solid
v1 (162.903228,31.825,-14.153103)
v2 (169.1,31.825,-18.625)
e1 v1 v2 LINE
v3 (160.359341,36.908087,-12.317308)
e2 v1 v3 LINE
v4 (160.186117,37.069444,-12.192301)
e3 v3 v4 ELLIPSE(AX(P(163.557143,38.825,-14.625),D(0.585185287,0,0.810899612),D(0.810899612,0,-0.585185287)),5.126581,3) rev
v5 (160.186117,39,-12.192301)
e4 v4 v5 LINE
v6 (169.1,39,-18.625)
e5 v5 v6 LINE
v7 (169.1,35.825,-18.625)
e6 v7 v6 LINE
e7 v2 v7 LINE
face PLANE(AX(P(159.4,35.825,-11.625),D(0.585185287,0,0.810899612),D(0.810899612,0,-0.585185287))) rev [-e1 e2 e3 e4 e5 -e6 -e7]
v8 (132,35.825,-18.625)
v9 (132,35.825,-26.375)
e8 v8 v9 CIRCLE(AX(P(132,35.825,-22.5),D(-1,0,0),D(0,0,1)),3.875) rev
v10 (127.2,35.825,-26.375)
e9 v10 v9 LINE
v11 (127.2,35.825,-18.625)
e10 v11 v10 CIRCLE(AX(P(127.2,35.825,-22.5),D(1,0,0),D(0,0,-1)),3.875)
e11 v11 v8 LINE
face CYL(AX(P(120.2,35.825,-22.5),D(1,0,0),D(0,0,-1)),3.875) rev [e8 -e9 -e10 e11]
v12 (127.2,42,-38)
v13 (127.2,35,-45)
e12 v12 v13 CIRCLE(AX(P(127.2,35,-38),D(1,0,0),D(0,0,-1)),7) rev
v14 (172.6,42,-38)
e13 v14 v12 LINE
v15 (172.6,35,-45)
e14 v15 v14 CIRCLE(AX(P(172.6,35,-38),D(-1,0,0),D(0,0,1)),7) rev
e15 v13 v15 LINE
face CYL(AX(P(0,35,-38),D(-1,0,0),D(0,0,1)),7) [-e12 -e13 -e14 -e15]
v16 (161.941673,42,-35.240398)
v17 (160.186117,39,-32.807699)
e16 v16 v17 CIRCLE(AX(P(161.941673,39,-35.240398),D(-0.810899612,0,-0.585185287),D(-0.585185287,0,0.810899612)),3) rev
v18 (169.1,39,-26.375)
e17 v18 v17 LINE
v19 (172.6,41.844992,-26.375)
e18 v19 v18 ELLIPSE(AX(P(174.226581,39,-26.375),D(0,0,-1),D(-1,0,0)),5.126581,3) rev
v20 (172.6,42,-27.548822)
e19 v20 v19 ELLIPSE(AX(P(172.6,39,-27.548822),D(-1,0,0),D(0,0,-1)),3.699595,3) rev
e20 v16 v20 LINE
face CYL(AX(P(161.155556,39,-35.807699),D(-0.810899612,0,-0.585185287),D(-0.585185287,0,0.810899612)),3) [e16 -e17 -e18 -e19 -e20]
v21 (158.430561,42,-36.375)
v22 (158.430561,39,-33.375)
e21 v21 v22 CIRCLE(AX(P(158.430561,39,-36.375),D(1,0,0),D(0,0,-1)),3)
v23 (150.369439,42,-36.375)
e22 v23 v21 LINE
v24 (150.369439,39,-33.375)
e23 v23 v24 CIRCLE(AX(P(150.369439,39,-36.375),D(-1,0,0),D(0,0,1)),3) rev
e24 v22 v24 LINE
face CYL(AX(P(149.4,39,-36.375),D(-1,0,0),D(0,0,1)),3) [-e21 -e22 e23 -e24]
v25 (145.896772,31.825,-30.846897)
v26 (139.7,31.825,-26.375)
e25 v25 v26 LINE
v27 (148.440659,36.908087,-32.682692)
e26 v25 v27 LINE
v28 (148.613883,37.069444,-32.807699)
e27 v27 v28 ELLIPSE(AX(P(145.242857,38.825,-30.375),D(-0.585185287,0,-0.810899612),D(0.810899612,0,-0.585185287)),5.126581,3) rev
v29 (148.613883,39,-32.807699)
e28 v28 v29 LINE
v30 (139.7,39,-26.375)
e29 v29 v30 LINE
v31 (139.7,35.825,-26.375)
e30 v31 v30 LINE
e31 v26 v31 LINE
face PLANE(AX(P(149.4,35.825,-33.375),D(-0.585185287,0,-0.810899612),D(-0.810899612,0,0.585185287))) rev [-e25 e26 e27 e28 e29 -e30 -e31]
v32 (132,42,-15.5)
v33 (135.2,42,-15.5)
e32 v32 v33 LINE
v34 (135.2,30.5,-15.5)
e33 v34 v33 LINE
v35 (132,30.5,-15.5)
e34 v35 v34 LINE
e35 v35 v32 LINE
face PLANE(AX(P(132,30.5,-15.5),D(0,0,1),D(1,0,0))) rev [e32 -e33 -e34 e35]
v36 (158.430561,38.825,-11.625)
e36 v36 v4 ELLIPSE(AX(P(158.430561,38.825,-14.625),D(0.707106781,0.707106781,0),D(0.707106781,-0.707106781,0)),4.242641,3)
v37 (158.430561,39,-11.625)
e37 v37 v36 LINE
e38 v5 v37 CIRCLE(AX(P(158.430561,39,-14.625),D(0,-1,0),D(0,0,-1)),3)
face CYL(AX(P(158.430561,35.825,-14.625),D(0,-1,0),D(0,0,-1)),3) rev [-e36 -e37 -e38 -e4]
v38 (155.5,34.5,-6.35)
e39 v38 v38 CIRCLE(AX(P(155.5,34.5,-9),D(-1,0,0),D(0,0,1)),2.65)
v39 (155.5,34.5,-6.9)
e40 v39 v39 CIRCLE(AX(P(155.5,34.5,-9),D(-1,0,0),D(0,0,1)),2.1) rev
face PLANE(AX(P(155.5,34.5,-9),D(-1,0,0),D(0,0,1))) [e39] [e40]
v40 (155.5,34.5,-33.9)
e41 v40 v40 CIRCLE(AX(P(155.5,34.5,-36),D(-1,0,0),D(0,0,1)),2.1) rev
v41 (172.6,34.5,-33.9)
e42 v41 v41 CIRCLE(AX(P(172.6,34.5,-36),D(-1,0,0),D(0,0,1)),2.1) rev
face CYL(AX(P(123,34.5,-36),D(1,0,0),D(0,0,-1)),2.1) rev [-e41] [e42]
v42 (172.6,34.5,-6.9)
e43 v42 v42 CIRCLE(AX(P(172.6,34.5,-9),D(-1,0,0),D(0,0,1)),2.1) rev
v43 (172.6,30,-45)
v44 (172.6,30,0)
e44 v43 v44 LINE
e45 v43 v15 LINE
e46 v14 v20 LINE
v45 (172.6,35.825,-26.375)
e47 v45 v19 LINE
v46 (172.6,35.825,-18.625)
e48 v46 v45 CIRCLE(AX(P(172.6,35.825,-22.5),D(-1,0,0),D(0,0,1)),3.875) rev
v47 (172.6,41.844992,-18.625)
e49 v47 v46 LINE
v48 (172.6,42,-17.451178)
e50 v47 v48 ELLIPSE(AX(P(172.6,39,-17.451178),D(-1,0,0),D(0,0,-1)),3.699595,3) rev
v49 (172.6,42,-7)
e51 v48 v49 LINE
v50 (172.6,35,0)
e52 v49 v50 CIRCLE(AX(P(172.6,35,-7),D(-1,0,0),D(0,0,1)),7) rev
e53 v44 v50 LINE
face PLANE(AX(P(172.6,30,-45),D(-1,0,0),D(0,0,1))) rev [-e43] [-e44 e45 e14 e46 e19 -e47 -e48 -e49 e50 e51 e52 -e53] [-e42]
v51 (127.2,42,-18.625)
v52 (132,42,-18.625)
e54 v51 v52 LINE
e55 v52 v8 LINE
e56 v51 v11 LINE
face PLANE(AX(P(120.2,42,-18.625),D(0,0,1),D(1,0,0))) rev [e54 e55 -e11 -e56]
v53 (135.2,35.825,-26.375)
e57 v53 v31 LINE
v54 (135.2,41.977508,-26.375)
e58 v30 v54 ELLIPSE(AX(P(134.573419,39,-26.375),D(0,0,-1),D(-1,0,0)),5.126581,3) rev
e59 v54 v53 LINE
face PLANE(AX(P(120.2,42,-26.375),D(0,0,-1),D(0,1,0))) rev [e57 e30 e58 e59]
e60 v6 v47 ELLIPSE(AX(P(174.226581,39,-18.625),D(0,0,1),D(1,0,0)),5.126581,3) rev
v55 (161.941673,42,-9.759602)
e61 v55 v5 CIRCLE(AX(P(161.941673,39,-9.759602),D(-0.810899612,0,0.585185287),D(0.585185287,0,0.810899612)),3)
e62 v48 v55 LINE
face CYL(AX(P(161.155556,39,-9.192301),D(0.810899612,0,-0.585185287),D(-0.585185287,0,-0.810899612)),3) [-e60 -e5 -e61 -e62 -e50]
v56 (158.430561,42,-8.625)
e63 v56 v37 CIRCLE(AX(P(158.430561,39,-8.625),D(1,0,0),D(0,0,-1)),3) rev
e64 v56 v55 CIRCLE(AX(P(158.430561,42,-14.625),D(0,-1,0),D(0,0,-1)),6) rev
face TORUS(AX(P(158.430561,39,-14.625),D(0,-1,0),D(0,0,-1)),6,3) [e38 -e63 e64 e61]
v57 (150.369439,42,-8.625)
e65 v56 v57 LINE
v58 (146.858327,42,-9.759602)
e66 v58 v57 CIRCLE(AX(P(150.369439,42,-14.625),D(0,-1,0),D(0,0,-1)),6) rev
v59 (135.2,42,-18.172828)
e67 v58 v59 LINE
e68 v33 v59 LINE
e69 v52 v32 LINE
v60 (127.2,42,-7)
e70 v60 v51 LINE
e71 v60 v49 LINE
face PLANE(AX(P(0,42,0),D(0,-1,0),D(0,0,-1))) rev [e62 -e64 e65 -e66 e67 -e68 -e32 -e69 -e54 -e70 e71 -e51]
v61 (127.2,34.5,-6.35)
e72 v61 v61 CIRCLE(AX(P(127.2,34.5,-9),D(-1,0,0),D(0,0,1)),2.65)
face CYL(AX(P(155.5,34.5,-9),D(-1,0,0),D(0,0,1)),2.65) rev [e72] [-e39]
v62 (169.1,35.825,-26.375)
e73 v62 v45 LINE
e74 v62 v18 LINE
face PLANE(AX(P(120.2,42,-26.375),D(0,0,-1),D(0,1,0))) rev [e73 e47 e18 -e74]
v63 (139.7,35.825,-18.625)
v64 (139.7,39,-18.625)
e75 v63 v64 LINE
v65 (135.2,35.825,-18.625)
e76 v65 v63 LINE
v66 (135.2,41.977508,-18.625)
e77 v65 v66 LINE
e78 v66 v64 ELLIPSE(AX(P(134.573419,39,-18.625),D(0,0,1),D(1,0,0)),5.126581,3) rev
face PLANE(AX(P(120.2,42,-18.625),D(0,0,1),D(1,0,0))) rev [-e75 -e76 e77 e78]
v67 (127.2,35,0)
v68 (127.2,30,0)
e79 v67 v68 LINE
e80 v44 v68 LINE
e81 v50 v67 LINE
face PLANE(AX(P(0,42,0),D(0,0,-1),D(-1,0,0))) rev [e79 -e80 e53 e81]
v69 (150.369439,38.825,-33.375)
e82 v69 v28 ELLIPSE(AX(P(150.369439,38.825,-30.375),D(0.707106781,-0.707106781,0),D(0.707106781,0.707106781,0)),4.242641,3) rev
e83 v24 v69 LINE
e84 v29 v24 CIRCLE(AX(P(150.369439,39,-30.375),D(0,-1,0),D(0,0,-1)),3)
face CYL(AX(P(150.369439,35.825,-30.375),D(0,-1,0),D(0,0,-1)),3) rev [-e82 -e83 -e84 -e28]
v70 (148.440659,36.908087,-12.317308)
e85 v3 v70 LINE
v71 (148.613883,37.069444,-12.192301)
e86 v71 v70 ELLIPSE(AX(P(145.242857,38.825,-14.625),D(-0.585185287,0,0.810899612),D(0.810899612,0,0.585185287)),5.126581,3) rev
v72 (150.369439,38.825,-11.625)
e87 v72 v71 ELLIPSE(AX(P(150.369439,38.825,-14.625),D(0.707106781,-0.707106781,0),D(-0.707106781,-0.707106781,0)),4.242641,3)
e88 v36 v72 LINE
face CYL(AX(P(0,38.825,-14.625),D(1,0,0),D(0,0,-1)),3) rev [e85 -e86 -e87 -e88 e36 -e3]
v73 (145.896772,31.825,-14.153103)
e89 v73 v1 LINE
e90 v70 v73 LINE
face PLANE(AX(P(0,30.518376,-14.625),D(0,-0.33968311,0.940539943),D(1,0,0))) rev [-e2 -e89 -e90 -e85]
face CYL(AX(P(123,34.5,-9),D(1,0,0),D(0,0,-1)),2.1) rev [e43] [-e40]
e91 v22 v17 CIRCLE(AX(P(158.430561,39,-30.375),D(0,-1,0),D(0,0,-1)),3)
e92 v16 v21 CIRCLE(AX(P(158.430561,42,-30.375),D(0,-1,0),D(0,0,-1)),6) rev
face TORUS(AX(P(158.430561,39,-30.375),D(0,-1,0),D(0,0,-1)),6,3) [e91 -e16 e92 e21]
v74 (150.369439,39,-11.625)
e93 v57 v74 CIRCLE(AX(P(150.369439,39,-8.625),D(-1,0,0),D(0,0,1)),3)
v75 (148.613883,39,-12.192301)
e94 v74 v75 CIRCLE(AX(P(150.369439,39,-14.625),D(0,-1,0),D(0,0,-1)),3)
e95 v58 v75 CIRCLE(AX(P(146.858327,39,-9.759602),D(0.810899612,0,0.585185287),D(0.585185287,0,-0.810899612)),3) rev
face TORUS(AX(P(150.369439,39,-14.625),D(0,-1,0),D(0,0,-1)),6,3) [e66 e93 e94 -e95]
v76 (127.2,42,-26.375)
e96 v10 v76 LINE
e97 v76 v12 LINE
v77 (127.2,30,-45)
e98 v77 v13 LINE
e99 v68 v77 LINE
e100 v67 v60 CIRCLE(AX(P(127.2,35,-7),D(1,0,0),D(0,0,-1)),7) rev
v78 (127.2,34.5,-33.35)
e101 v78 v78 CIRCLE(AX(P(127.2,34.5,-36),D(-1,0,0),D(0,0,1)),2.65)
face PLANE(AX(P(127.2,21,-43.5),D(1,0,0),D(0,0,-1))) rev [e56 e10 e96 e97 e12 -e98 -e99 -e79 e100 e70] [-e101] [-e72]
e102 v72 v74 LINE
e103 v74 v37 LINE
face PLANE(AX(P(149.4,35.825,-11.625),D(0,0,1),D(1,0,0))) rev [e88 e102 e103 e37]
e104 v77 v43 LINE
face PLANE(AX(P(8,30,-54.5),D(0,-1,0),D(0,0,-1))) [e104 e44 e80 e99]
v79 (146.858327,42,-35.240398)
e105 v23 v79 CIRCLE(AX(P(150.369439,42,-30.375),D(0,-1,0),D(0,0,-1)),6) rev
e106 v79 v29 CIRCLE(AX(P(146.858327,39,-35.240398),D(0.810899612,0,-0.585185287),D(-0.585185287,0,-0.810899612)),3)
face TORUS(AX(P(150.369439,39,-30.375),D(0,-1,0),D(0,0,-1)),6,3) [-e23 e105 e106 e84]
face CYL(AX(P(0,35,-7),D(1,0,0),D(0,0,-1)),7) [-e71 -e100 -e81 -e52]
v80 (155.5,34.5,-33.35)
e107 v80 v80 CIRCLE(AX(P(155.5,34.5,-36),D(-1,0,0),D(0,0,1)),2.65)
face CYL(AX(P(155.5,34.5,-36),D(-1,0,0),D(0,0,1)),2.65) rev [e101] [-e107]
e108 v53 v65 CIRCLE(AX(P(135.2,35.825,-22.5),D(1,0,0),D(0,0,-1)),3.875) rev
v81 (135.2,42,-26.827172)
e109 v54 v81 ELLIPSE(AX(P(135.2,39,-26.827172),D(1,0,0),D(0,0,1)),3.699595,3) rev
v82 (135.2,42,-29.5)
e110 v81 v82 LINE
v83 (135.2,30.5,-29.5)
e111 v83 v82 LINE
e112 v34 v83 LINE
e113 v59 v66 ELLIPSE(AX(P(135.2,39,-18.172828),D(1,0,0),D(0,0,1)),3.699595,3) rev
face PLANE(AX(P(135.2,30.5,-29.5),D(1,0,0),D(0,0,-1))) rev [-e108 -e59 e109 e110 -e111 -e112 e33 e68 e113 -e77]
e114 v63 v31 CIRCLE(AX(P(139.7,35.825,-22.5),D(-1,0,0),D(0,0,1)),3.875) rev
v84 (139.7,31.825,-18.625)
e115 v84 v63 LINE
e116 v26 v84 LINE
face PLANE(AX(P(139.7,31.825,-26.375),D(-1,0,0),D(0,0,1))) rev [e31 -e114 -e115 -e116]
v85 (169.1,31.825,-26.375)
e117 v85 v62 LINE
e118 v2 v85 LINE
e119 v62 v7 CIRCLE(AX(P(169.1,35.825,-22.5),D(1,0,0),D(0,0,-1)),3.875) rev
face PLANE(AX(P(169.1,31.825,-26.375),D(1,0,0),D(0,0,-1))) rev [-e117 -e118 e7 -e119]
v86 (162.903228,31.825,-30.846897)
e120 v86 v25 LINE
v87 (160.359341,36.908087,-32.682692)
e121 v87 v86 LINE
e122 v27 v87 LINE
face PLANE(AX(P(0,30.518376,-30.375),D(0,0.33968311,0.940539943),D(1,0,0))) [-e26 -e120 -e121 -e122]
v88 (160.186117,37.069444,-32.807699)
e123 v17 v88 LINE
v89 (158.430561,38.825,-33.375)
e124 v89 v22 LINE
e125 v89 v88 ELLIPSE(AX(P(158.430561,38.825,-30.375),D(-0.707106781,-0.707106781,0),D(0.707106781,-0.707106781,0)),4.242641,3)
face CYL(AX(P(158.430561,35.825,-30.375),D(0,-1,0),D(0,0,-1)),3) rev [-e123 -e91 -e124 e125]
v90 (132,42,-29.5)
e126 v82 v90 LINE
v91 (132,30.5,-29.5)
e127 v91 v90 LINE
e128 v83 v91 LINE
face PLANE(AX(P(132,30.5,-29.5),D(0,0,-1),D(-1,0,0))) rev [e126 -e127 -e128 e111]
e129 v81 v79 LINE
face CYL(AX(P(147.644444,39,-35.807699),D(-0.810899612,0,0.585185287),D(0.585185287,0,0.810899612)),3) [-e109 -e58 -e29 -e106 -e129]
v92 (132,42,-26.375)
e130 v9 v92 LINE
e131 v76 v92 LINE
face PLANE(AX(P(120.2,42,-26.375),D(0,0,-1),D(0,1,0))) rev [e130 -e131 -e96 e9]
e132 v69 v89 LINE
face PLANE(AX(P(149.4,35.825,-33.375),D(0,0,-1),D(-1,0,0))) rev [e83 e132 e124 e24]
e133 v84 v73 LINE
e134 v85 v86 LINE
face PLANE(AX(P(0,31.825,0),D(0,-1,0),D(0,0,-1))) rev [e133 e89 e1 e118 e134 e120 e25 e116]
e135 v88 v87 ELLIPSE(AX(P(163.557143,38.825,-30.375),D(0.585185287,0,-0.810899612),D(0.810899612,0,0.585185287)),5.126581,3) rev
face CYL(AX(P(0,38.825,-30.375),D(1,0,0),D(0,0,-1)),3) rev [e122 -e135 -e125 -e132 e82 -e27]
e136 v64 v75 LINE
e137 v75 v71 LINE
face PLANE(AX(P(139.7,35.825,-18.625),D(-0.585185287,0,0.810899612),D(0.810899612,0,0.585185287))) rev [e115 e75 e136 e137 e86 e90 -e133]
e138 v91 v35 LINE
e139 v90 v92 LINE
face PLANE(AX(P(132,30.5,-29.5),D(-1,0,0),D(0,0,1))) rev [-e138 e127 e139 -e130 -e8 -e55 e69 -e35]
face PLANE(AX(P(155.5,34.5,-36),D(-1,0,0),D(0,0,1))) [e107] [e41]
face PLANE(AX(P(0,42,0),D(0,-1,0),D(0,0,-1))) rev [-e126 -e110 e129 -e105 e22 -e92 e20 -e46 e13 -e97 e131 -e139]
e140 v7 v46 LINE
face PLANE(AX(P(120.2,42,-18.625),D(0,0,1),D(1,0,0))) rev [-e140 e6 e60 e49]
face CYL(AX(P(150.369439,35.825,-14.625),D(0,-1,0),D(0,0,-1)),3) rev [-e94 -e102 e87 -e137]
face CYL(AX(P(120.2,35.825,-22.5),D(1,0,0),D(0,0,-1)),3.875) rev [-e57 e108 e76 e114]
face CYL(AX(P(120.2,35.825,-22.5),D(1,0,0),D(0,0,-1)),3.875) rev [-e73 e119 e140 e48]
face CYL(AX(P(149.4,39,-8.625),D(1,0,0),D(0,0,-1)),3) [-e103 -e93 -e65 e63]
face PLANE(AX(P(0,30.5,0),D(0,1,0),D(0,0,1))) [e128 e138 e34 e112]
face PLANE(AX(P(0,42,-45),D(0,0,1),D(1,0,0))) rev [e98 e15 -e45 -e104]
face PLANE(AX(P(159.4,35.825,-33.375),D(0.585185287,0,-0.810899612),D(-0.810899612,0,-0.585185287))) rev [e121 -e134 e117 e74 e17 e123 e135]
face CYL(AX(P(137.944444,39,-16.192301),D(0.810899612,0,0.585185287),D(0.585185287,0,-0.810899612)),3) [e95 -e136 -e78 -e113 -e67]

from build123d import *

# Parameters (mm, degrees)
SKETCH1_W                = 218
SKETCH1_H                = 45
BOSS_EXTRUDE1_DEPTH      = 42
SKETCH7_W                = 118.2
SKETCH7_H                = 42
CUT_EXTRUDE17_DEPTH      = 21
SKETCH4_W                = 7.75
SKETCH4_H                = 6.175
CUT_EXTRUDE14_DEPTH      = 97.8
SKETCH5_R                = 3.875
CUT_EXTRUDE15_DEPTH      = 97.8
SKETCH11_W               = 3.2
SKETCH11_H               = 14
CUT_EXTRUDE19_DEPTH      = 11.5
CUT_EXTRUDE43_DEPTH      = 7
SKETCH53_R               = 2.1
CUT_EXTRUDE44_DEPTH      = 95
SKETCH68_R               = 2.65
CUT_EXTRUDE57_DEPTH      = 28.3
BOSS_EXTRUDE2_DEPTH      = 5
SKETCH42_W               = 80.5
SKETCH42_H               = 9.5
BOSS_EXTRUDE3_DEPTH      = 35
SKETCH38_R               = 3.1
CUT_EXTRUDE32_DEPTH      = 4.7
SKETCH40_R               = 5.5
CUT_EXTRUDE34_DEPTH      = 9
SKETCH41_R               = 5.75
CUT_EXTRUDE35_DEPTH      = 4
FILLET1_R                = 7
FILLET7_R                = 5
SKETCH47_R               = 1.5
CUT_EXTRUDE39_DEPTH      = 7
SKETCH49_R               = 2.8
CUT_EXTRUDE41_DEPTH      = 33
SKETCH56_W               = 15.8
SKETCH56_H               = 10.4
CUT_EXTRUDE47_DEPTH      = 32.15
SKETCH57_W               = 5
SKETCH57_H               = 10.4
CUT_EXTRUDE48_DEPTH      = 15
SKETCH58_R               = 2.8
SKETCH58_R_2             = 2.05
CUT_EXTRUDE49_DEPTH      = 10
SKETCH59_R               = 1.5
SKETCH59_R_2             = 0.95
CUT_EXTRUDE50_DEPTH      = 6.5
CUT_EXTRUDE51_START      = -9
CUT_EXTRUDE51_DEPTH      = 9
CUT_EXTRUDE52_DEPTH      = 118.2
SKETCH64_R               = 1.5
CUT_EXTRUDE53_DEPTH      = 14
SKETCH65_R               = 2.8
CUT_EXTRUDE54_DEPTH      = 9.95
SKETCH66_R               = 1.5
CUT_EXTRUDE55_DEPTH      = 25
SKETCH67_R               = 1.45
CUT_EXTRUDE56_DEPTH      = 7
CUT_EXTRUDE58_START      = -4
SKETCH69_R               = 2.8
CUT_EXTRUDE58_DEPTH      = 41
CUT_EXTRUDE59_DEPTH      = 6.175
FILLET17_R               = 3
CUT_EXTRUDE64_DEPTH      = 4
FILLET19_R               = 3
CUT_EXTRUDE65_DEPTH      = 4
CUT_EXTRUDE61_DEPTH      = 1
CUT_EXTRUDE61_DEPTH_BACK = 221.034656475
SKETCH72_W               = 64
SKETCH72_H               = 35
SKETCH74_W               = 118.2
SKETCH74_H               = 64
CUT_EXTRUDE62_DEPTH      = 226.02944262
SKETCH81_W               = 45.4
SKETCH81_H               = 45
CUT_EXTRUDE66_DEPTH      = 12


with BuildPart() as part:
    # Sketch1 → Boss-Extrude1 (new body)
    with BuildSketch(Plane(origin=(0, 0, 0), x_dir=(1, 0, 0), z_dir=(0, 1, 0))):
        with Locations((109, 22.5)):
            Rectangle(SKETCH1_W, SKETCH1_H)
    extrude(amount=BOSS_EXTRUDE1_DEPTH)

    # Sketch7 → Cut-Extrude17 (cut)
    with BuildSketch(Plane(origin=(0, 42, 0), x_dir=(1, 0, 0), z_dir=(0, 1, 0))):
        with Locations((68.1, 22.5)):
            Rectangle(SKETCH7_W, SKETCH7_H)
    extrude(amount=-CUT_EXTRUDE17_DEPTH, mode=Mode.SUBTRACT)

    # Sketch4 → Cut-Extrude14 (cut)
    with BuildSketch(Plane(origin=(218, 0, 0), x_dir=(0, 0, -1), z_dir=(1, 0, 0))):
        with Locations((22.5, 38.9125)):
            Rectangle(SKETCH4_W, SKETCH4_H)
    extrude(amount=-CUT_EXTRUDE14_DEPTH, mode=Mode.SUBTRACT)

    # Sketch5 → Cut-Extrude15 (cut)
    with BuildSketch(Plane(origin=(218, 0, 0), x_dir=(0, 0, -1), z_dir=(1, 0, 0))):
        with Locations((22.5, 35.825)):
            Circle(SKETCH5_R)
    extrude(amount=-CUT_EXTRUDE15_DEPTH, mode=Mode.SUBTRACT)

    # Sketch11 → Cut-Extrude19 (cut)
    with BuildSketch(Plane(origin=(0, 42, 0), x_dir=(1, 0, 0), z_dir=(0, 1, 0))):
        with Locations((133.6, 22.5)):
            Rectangle(SKETCH11_W, SKETCH11_H)
    extrude(amount=-CUT_EXTRUDE19_DEPTH, mode=Mode.SUBTRACT)

    # Sketch52 → Cut-Extrude43 (cut)
    with BuildSketch(Plane(origin=(218, 0, 0), x_dir=(0, 0, -1), z_dir=(1, 0, 0))):
        with BuildLine():
            Line((17.475, 42), (17.475, 35.825))
            ThreePointArc((17.475, 35.825), (22.5, 30.8), (27.525, 35.825))
            Line((27.525, 35.825), (27.525, 42))
            Line((27.525, 42), (17.475, 42))
        make_face()
    extrude(amount=-CUT_EXTRUDE43_DEPTH, mode=Mode.SUBTRACT)

    # Sketch53 → Cut-Extrude44 (cut)
    with BuildSketch(Plane(origin=(218, 0, 0), x_dir=(0, 0, -1), z_dir=(1, 0, 0))):
        with Locations((9, 34.5)):
            Circle(SKETCH53_R)
        with Locations((36, 34.5)):
            Circle(SKETCH53_R)
    extrude(amount=-CUT_EXTRUDE44_DEPTH, mode=Mode.SUBTRACT)

    # Sketch68 → Cut-Extrude57 (cut)
    with BuildSketch(Plane.ZY.offset(-127.2)):
        with Locations((-9, 34.5)):
            Circle(SKETCH68_R)
        with Locations((-36, 34.5)):
            Circle(SKETCH68_R)
    extrude(amount=-CUT_EXTRUDE57_DEPTH, mode=Mode.SUBTRACT)

    # Sketch14 → Boss-Extrude2 (add)
    with BuildSketch(Plane.XZ):
        Polygon((9, -54.5), (89.5, -54.5), (89.5, -45), (218, -45), (218, 0), (89.5, 0), (89.5, 9.5), (9, 9.5), (9, 0), (0, 0), (0, -45), (9, -45), align=None)
    extrude(amount=BOSS_EXTRUDE2_DEPTH)

    # Sketch42 → Boss-Extrude3 (add)
    with BuildSketch(Plane(origin=(0, 0, 0), x_dir=(1, 0, 0), z_dir=(0, 1, 0))):
        with Locations((49.25, -4.75)):
            Rectangle(SKETCH42_W, SKETCH42_H)
        with Locations((49.25, 49.75)):
            Rectangle(SKETCH42_W, SKETCH42_H)
    extrude(amount=BOSS_EXTRUDE3_DEPTH)

    # Sketch38 → Cut-Extrude32 (cut)
    with BuildSketch(Plane(origin=(127.2, -5, -22.5), x_dir=(0, 0, -1), z_dir=(0, -1, 0))):
        with Locations((23.5, -61.2)):
            Circle(SKETCH38_R)
        with Locations((10, -61.2)):
            Circle(SKETCH38_R)
    extrude(amount=-CUT_EXTRUDE32_DEPTH, mode=Mode.SUBTRACT)

    # Sketch40 → Cut-Extrude34 (cut)
    with BuildSketch(Plane(origin=(127.2, -5, -22.5), x_dir=(0, 0, -1), z_dir=(0, -1, 0))):
        with Locations((0, -33.7)):
            Circle(SKETCH40_R)
    extrude(amount=-CUT_EXTRUDE34_DEPTH, mode=Mode.SUBTRACT)

    # Sketch41 → Cut-Extrude35 (cut)
    with BuildSketch(Plane(origin=(127.2, -5, -22.5), x_dir=(0, 0, -1), z_dir=(0, -1, 0))):
        with Locations((20, -73.2)):
            Circle(SKETCH41_R)
        with Locations((-20, -73.2)):
            Circle(SKETCH41_R)
    extrude(amount=-CUT_EXTRUDE35_DEPTH, mode=Mode.SUBTRACT)

    # Fillet1
    # the kernel refuses this fillet: 7 mm, written as the material it takes off along each edge
    with BuildSketch(Plane(origin=(235.5, 42, -45), x_dir=(0, 0, 1), z_dir=(-1, 0, 0))) as fillet1_piece_1:
        with BuildLine():
            CenterArc((FILLET1_R, -FILLET1_R), FILLET1_R, 90, 90)
            Line((0, -FILLET1_R), (0, 0))
            Line((0, 0), (FILLET1_R, 0))
        make_face()
    extrude(amount=253, mode=Mode.SUBTRACT)
    with BuildSketch(Plane(origin=(-17.5, 42, 0), x_dir=(0, -1, 0), z_dir=(1, 0, 0))) as fillet1_piece_2:
        with BuildLine():
            CenterArc((FILLET1_R, FILLET1_R), FILLET1_R, 180, 90)
            Line((0, FILLET1_R), (0, 0))
            Line((0, 0), (FILLET1_R, 0))
        make_face()
    extrude(amount=253, mode=Mode.SUBTRACT)

    # Fillet7
    fillet7_edges = [part.edges().sort_by_distance(p)[0] for p in [
        (49.25, 35, -54.5),
        (49.25, 35, 9.5),
    ]]
    fillet(fillet7_edges, radius=FILLET7_R)

    # Sketch47 → Cut-Extrude39 (cut)
    with BuildSketch(Plane(origin=(127.2, -0.3, -22.5), x_dir=(0, 0, -1), z_dir=(0, -1, 0))):
        with Locations((23.5, -61.2)):
            Circle(SKETCH47_R)
        with Locations((10, -61.2)):
            Circle(SKETCH47_R)
    extrude(amount=-CUT_EXTRUDE39_DEPTH, mode=Mode.SUBTRACT)

    # Sketch49 → Cut-Extrude41 (cut)
    with BuildSketch(Plane.XZ.offset(-6.7)):
        with Locations(Location((66, -32.5, 0), (0, 0, 270))):
            Circle(SKETCH49_R)
        with Locations(Location((66, -46, 0), (0, 0, 270))):
            Circle(SKETCH49_R)
    extrude(amount=-CUT_EXTRUDE41_DEPTH, mode=Mode.SUBTRACT)

    # Sketch56 → Cut-Extrude47 (cut)
    with BuildSketch(Plane.XZ.offset(5)):
        with Locations((135.1, -14.2)):
            Rectangle(SKETCH56_W, SKETCH56_H)
    extrude(amount=-CUT_EXTRUDE47_DEPTH, mode=Mode.SUBTRACT)

    # Sketch57 → Cut-Extrude48 (cut)
    with BuildSketch(Plane.XZ.offset(5)):
        with Locations((124.7, -14.2)):
            Rectangle(SKETCH57_W, SKETCH57_H)
    extrude(amount=-CUT_EXTRUDE48_DEPTH, mode=Mode.SUBTRACT)

    # Sketch58 → Cut-Extrude49 (cut)
    with BuildSketch(Plane(origin=(127.2, 21, 0), x_dir=(0, -1, 0), z_dir=(0, 0, 1))):
        with Locations(Location((19.05, 2.8, 0), (0, 0, 90))):
            Circle(SKETCH58_R)
        with Locations(Location((10.15, 2.8, 0), (0, 0, 90))):
            Circle(SKETCH58_R_2)
        with BuildLine():
            Line((-2.632795978, 15.65), (-3.667204022, 15.65))
            ThreePointArc((-3.667204022, 15.65), (-5.85, 13), (-3.667204022, 10.35))
            Line((-3.667204022, 10.35), (-2.632795978, 10.35))
            ThreePointArc((-2.632795978, 10.35), (-0.45, 13), (-2.632795978, 15.65))
        make_face()
    extrude(amount=-CUT_EXTRUDE49_DEPTH, mode=Mode.SUBTRACT)

    # Sketch59 → Cut-Extrude50 (cut)
    with BuildSketch(Plane.XY.offset(-19.4)):
        with Locations((130, 1.95)):
            Circle(SKETCH59_R)
        with Locations((130, 10.85)):
            Circle(SKETCH59_R_2)
        with Locations((140.2, 24.15)):
            Circle(SKETCH59_R)
    extrude(amount=-CUT_EXTRUDE50_DEPTH, mode=Mode.SUBTRACT)

    # Sketch62 → Cut-Extrude51 (cut)
    with BuildSketch(Plane.ZY.offset(CUT_EXTRUDE51_START)):
        with BuildLine():
            Line((0, -5), (-45, -5))
            Line((-45, -5), (-45, 35))
            ThreePointArc((-45, 35), (-42.949747468, 39.949747468), (-38, 42))
            Line((-38, 42), (-7, 42))
            ThreePointArc((-7, 42), (-2.050252532, 39.949747468), (0, 35))
            Line((0, 35), (0, -5))
        make_face()
    extrude(amount=CUT_EXTRUDE51_DEPTH, mode=Mode.SUBTRACT)

    # Sketch63 → Cut-Extrude52 (cut)
    with BuildSketch(Plane(origin=(127.2, 21, -22.5), x_dir=(0, 0, -1), z_dir=(-1, 0, 0))):
        with BuildLine():
            Line((-10.959716831, -18.950283169), (11.040283169, -18.950283169))
            ThreePointArc((11.040283169, -18.950283169), (18.111350981, -16.021350981), (21.040283169, -8.950283169))
            Line((21.040283169, -8.950283169), (21.040283169, 2.049716831))
            ThreePointArc((21.040283169, 2.049716831), (18.111350981, 9.120784643), (11.040283169, 12.049716831))
            Line((11.040283169, 12.049716831), (-10.959716831, 12.049716831))
            ThreePointArc((-10.959716831, 12.049716831), (-18.030784643, 9.120784643), (-20.959716831, 2.049716831))
            Line((-20.959716831, 2.049716831), (-20.959716831, -8.950283169))
            ThreePointArc((-20.959716831, -8.950283169), (-18.030784643, -16.021350981), (-10.959716831, -18.950283169))
        make_face()
    extrude(amount=CUT_EXTRUDE52_DEPTH, mode=Mode.SUBTRACT)

    # Sketch64 → Cut-Extrude53 (cut)
    with BuildSketch(Plane(origin=(127.2, -5, -22.5), x_dir=(0, 0, -1), z_dir=(0, -1, 0))):
        with Locations((-1, -71.2)):
            Circle(SKETCH64_R)
    extrude(amount=-CUT_EXTRUDE53_DEPTH, mode=Mode.SUBTRACT)

    # Sketch65 → Cut-Extrude54 (cut)
    with BuildSketch(Plane(origin=(127.2, 8.950283169, -22.5), x_dir=(0, 0, 1), z_dir=(0, 1, 0))):
        with Locations((1, -71.2)):
            Circle(SKETCH65_R)
    extrude(amount=-CUT_EXTRUDE54_DEPTH, mode=Mode.SUBTRACT)

    # Sketch66 → Cut-Extrude55 (cut)
    with BuildSketch(Plane(origin=(127.2, -5, -22.5), x_dir=(0, 0, -1), z_dir=(0, -1, 0))):
        with Locations((-20, -52.2)):
            Circle(SKETCH66_R)
    extrude(amount=-CUT_EXTRUDE55_DEPTH, mode=Mode.SUBTRACT)

    # Sketch67 → Cut-Extrude56 (cut)
    with BuildSketch(Plane(origin=(9, 21, -22.5), x_dir=(0, 0, -1), z_dir=(-1, 0, 0))):
        with Locations(Location((27, -9, 0), (0, 0, 180))):
            Circle(SKETCH67_R)
        with Locations(Location((27, 21, 0), (0, 0, 180))):
            Circle(SKETCH67_R)
        with Locations(Location((-27, 21, 0), (0, 0, 180))):
            Circle(SKETCH67_R)
        with Locations(Location((-27, -9, 0), (0, 0, 180))):
            Circle(SKETCH67_R)
    extrude(amount=-CUT_EXTRUDE56_DEPTH, mode=Mode.SUBTRACT)

    # Sketch69 → Cut-Extrude58 (cut)
    with BuildSketch(Plane(origin=(127.2, -5, -22.5), x_dir=(0, 0, -1), z_dir=(0, -1, 0)).offset(CUT_EXTRUDE58_START)):
        with Locations((-20, -52.2)):
            Circle(SKETCH69_R)
    extrude(amount=-CUT_EXTRUDE58_DEPTH, mode=Mode.SUBTRACT)

    # Sketch70 → Cut-Extrude59 (cut)
    with BuildSketch(Plane(origin=(0, 42, 0), x_dir=(1, 0, 0), z_dir=(0, 1, 0))):
        Polygon((149.4, 33.375), (159.4, 33.375), (169.1, 26.375), (139.7, 26.375), align=None)
        Polygon((177.1, 26.375), (186.8, 33.375), (196.8, 33.375), (206.5, 26.375), align=None)
        Polygon((139.7, 18.625), (149.4, 11.625), (159.4, 11.625), (169.1, 18.625), align=None)
        Polygon((177.1, 18.625), (186.8, 11.625), (196.8, 11.625), (206.5, 18.625), align=None)
    extrude(amount=-CUT_EXTRUDE59_DEPTH, mode=Mode.SUBTRACT)

    # Fillet17
    fillet17_edges = [part.edges().sort_by_distance(p)[0] for p in [
        (154.4, 35.825, -11.625),
        (159.4, 38.9125, -11.625),
        (149.4, 38.9125, -11.625),
        (144.55, 42, -15.125),
        (154.4, 42, -11.625),
        (164.25, 42, -15.125),
        (154.4, 35.825, -33.375),
        (149.4, 38.9125, -33.375),
        (159.4, 38.9125, -33.375),
        (164.25, 42, -29.875),
        (154.4, 42, -33.375),
        (144.55, 42, -29.875),
    ]]
    fillet(fillet17_edges, radius=FILLET17_R)

    # Sketch78 → Cut-Extrude64 (cut)
    with BuildSketch(Plane(origin=(0, 35.825, 0), x_dir=(1, 0, 0), z_dir=(0, 1, 0))):
        Polygon((145.242857143, 30.375), (163.557142857, 30.375), (169.1, 26.375), (169.1, 18.625), (163.557142857, 14.625), (145.242857143, 14.625), (139.7, 18.625), (139.7, 26.375), align=None)
    extrude(amount=-CUT_EXTRUDE64_DEPTH, mode=Mode.SUBTRACT)

    # Fillet19
    # the kernel refuses this fillet: 3 mm, written as the material it adds along each edge
    with BuildSketch(Plane(origin=(186.8, 42, -11.625), x_dir=(-0.8108996116451952, 0, -0.5851852867542652), z_dir=(0, -1, 0)), Plane(origin=(196.8, 42, -11.625), x_dir=(-1, 0, 0), z_dir=(0, -1, 0))) as fillet19_piece_1:
        with BuildLine():
            CenterArc((FILLET19_R * 0.323146177177, FILLET19_R), FILLET19_R, 234.183919251, 35.816080749)
            Line((-FILLET19_R * 0.262039109577, FILLET19_R * 0.189100388355), (0, 0))
            Line((0, 0), (FILLET19_R * 0.323146177177, 0))
        make_face()
    extrude(amount=8.598596329)
    with BuildSketch(Plane(origin=(179.3, 35.825, -11.625), x_dir=(0, 1, 0), z_dir=(1, 0, 0))) as fillet19_piece_2:
        with BuildLine():
            CenterArc((FILLET19_R, -FILLET19_R), FILLET19_R, 90, 90)
            Line((0, -FILLET19_R), (0, 0))
            Line((0, 0), (FILLET19_R, 0))
        make_face()
    extrude(amount=25)
    with BuildSketch(Plane(origin=(196.8, 42, -33.375), x_dir=(-1, 0, 0), z_dir=(0, -1, 0)), Plane(origin=(186.8, 42, -33.375), x_dir=(-0.8108996116451974, 0, 0.5851852867542621), z_dir=(0, -1, 0))) as fillet19_piece_3:
        with BuildLine():
            CenterArc((FILLET19_R * 0.323146177177, -FILLET19_R), FILLET19_R, 90, 35.816080749)
            Line((-FILLET19_R * 0.262039109577, -FILLET19_R * 0.189100388355), (0, 0))
            Line((0, 0), (FILLET19_R * 0.323146177177, 0))
        make_face()
    extrude(amount=8.598596329)
    with BuildSketch(Plane(origin=(179.3, 35.825, -33.375), x_dir=(0, 1, 0), z_dir=(1, 0, 0))) as fillet19_piece_4:
        with BuildLine():
            CenterArc((FILLET19_R, FILLET19_R), FILLET19_R, 180, 90)
            Line((0, FILLET19_R), (0, 0))
            Line((0, 0), (FILLET19_R, 0))
        make_face()
    extrude(amount=25)
    # the kernel refuses this fillet: 3 mm, written as the material it takes off along each edge
    with BuildSketch(Plane(origin=(171.018252913, 42, -23.013889651), x_dir=(-0.5851852867542667, 0, 0.8108996116451942), z_dir=(0.8108996116451941, 0, 0.5851852867542667)), Plane(origin=(197.586117329, 42, -12.192301165), x_dir=(0.5851852867542677, 0, 0.8108996116451934), z_dir=(0.8108996116451934, 0, -0.5851852867542677))) as fillet19_2_piece_1:
        with BuildLine():
            CenterArc((FILLET19_R, FILLET19_R), FILLET19_R, 180, 90)
            Line((0, FILLET19_R), (0, 0))
            Line((0, 0), (FILLET19_R, 0))
        make_face()
    extrude(amount=18.492584709, mode=Mode.SUBTRACT)
    with BuildSketch(Plane(origin=(197.586117329, 42, -32.807698835), x_dir=(0.585185286754268, 0, -0.8108996116451932), z_dir=(0.8108996116451932, 0, 0.585185286754268)), Plane(origin=(171.018252913, 42, -21.986110349), x_dir=(-0.5851852867542668, 0, -0.810899611645194), z_dir=(0.8108996116451941, 0, -0.5851852867542668))) as fillet19_2_piece_2:
        with BuildLine():
            CenterArc((FILLET19_R, -FILLET19_R), FILLET19_R, 90, 90)
            Line((0, -FILLET19_R), (0, 0))
            Line((0, 0), (FILLET19_R, 0))
        make_face()
    extrude(amount=18.492584709, mode=Mode.SUBTRACT)
    with BuildSketch(Plane(origin=(187.769438532, 42, -11.625), x_dir=(0, 0, 1), z_dir=(1, 0, 0))) as fillet19_2_piece_3:
        with BuildLine():
            CenterArc((FILLET19_R, FILLET19_R), FILLET19_R, 180, 90)
            Line((0, FILLET19_R), (0, 0))
            Line((0, 0), (FILLET19_R, 0))
        make_face()
    extrude(amount=8.061122937, mode=Mode.SUBTRACT)
    with BuildSketch(Plane(origin=(187.769438532, 42, -33.375), x_dir=(0, 0, -1), z_dir=(1, 0, 0))) as fillet19_2_piece_4:
        with BuildLine():
            CenterArc((FILLET19_R, -FILLET19_R), FILLET19_R, 90, 90)
            Line((0, -FILLET19_R), (0, 0))
            Line((0, 0), (FILLET19_R, 0))
        make_face()
    extrude(amount=8.061122937, mode=Mode.SUBTRACT)
    with BuildSketch(Plane(origin=(187.769438532, 42, -30.375), x_dir=(-0.5851852867542677, 0, -0.8108996116451933), z_dir=(-0.8108996116451933, 0, 0.5851852867542677))) as fillet19_2_piece_5:
        with BuildLine():
            CenterArc((3 + FILLET19_R, FILLET19_R), FILLET19_R, 180, 90)
            Line((3, FILLET19_R), (3, 0))
            Line((3, 0), (3 + FILLET19_R, 0))
        make_face()
    revolve(axis=Axis((187.769438532, 42, -30.375), (0, -1, 0)), revolution_arc=35.816080749, mode=Mode.SUBTRACT)
    with BuildSketch(Plane(origin=(195.830561468, 42, -30.375), x_dir=(0, 0, -1), z_dir=(-1, 0, 0))) as fillet19_2_piece_6:
        with BuildLine():
            CenterArc((3 + FILLET19_R, FILLET19_R), FILLET19_R, 180, 90)
            Line((3, FILLET19_R), (3, 0))
            Line((3, 0), (3 + FILLET19_R, 0))
        make_face()
    revolve(axis=Axis((195.830561468, 42, -30.375), (0, -1, 0)), revolution_arc=35.816080749, mode=Mode.SUBTRACT)
    with BuildSketch(Plane(origin=(187.769438532, 42, -14.625), x_dir=(-0.5851852867542673, 0, 0.8108996116451938), z_dir=(-0.8108996116451938, 0, -0.5851852867542673))) as fillet19_2_piece_7:
        with BuildLine():
            CenterArc((3 + FILLET19_R, -FILLET19_R), FILLET19_R, 90, 90)
            Line((3, -FILLET19_R), (3, 0))
            Line((3, 0), (3 + FILLET19_R, 0))
        make_face()
    revolve(axis=Axis((187.769438532, 42, -14.625), (0, 1, 0)), revolution_arc=35.816080749, mode=Mode.SUBTRACT)
    with BuildSketch(Plane(origin=(195.830561468, 42, -14.625), x_dir=(0, 0, 1), z_dir=(-1, 0, 0))) as fillet19_2_piece_8:
        with BuildLine():
            CenterArc((3 + FILLET19_R, -FILLET19_R), FILLET19_R, 90, 90)
            Line((3, -FILLET19_R), (3, 0))
            Line((3, 0), (3 + FILLET19_R, 0))
        make_face()
    revolve(axis=Axis((195.830561468, 42, -14.625), (0, 1, 0)), revolution_arc=35.816080749, mode=Mode.SUBTRACT)

    # Sketch79 → Cut-Extrude65 (cut)
    with BuildSketch(Plane(origin=(0, 35.825, 0), x_dir=(1, 0, 0), z_dir=(0, 1, 0))):
        Polygon((182.642857143, 30.375), (177.1, 26.375), (177.1, 18.625), (182.642857143, 14.625), (200.957142857, 14.625), (206.5, 18.625), (206.5, 26.375), (200.957142857, 30.375), align=None)
    extrude(amount=-CUT_EXTRUDE65_DEPTH, mode=Mode.SUBTRACT)

    # Chamfer1
    # the kernel refuses this chamfer: 10 mm, written as the material it takes off along each edge
    with BuildSketch(Plane(origin=(168.431697314, 35.825, -30.375), x_dir=(0, 0.5127284623875434, -0.8585508277660127), z_dir=(1, 0, 0))) as chamfer1_piece_1_section:
        with BuildLine():
            Line((2.846151297, 0), (-3.030407819, -4.809340769))
            Line((-3.030407819, -4.809340769), (-3.202117985, -4.706795077))
            ThreePointArc((-3.202117985, -4.706795077), (-1.628587032, -2.336957732), (-0.171710166, 0.102545692))
            Line((-0.171710166, 0.102545692), (0.102545692, 0.171710166))
            ThreePointArc((0.102545692, 0.171710166), (1.413174006, -0.221555438), (2.779590285, 0.188599129))
            Line((2.779590285, 0.188599129), (2.846151297, 0))
        make_face()
    chamfer1_piece_1 = extrude(amount=46.736605371, mode=Mode.PRIVATE)
    chamfer1_piece_1 = split(chamfer1_piece_1, bisect_by=Plane(origin=(188.974245231, 34.450110824, -34.94404295), z_dir=(0.5851852867542668, 0, 0.8108996116451941)), keep=Keep.TOP, mode=Mode.PRIVATE)
    chamfer1_piece_1 = split(chamfer1_piece_1, bisect_by=Plane(origin=(194.625754769, 34.450110824, -34.94404295), z_dir=(-0.585185286754268, 0, 0.8108996116451932)), keep=Keep.TOP, mode=Mode.PRIVATE)
    chamfer1_piece_1 = split(chamfer1_piece_1, bisect_by=Plane(origin=(191.8, 31.825, -31.028354199), z_dir=(0, 1, 0)), keep=Keep.TOP, mode=Mode.PRIVATE)
    add(chamfer1_piece_1, mode=Mode.SUBTRACT)
    with BuildSketch(Plane(origin=(131.031697314, 35.825, -30.375), x_dir=(0, 0.5127284623875334, -0.8585508277660184), z_dir=(1, 0, 0))) as chamfer1_piece_2_section:
        with BuildLine():
            Line((2.846151297, 0), (-3.030407819, -4.809340769))
            Line((-3.030407819, -4.809340769), (-3.202117985, -4.706795077))
            ThreePointArc((-3.202117985, -4.706795077), (-1.628587032, -2.336957732), (-0.171710166, 0.102545692))
            Line((-0.171710166, 0.102545692), (0.102545692, 0.171710166))
            ThreePointArc((0.102545692, 0.171710166), (1.413174006, -0.221555438), (2.779590285, 0.188599129))
            Line((2.779590285, 0.188599129), (2.846151297, 0))
        make_face()
    chamfer1_piece_2 = extrude(amount=46.736605371, mode=Mode.PRIVATE)
    chamfer1_piece_2 = split(chamfer1_piece_2, bisect_by=Plane(origin=(157.225754769, 34.450110824, -34.94404295), z_dir=(-0.5851852867542653, 0, 0.8108996116451952)), keep=Keep.TOP, mode=Mode.PRIVATE)
    chamfer1_piece_2 = split(chamfer1_piece_2, bisect_by=Plane(origin=(151.574245231, 34.450110824, -34.94404295), z_dir=(0.5851852867542653, 0, 0.8108996116451952)), keep=Keep.TOP, mode=Mode.PRIVATE)
    chamfer1_piece_2 = split(chamfer1_piece_2, bisect_by=Plane(origin=(154.4, 31.825, -31.028354199), z_dir=(0, 1, 0)), keep=Keep.TOP, mode=Mode.PRIVATE)
    add(chamfer1_piece_2, mode=Mode.SUBTRACT)

    # Chamfer2
    # the kernel refuses this chamfer: 10 mm, written as the material it takes off along each edge
    with BuildSketch(Plane(origin=(168.431697314, 35.825, -14.625), x_dir=(0, 0.5127284623875406, 0.8585508277660144), z_dir=(1, 0, 0))) as chamfer2_piece_1_section:
        with BuildLine():
            Line((2.846151297, 0), (-3.030407819, 4.809340769))
            Line((-3.030407819, 4.809340769), (-3.202117985, 4.706795077))
            ThreePointArc((-3.202117985, 4.706795077), (-1.628587032, 2.336957732), (-0.171710166, -0.102545692))
            Line((-0.171710166, -0.102545692), (0.102545692, -0.171710166))
            ThreePointArc((0.102545692, -0.171710166), (1.413174006, 0.221555438), (2.779590285, -0.188599129))
            Line((2.779590285, -0.188599129), (2.846151297, 0))
        make_face()
    chamfer2_piece_1 = extrude(amount=46.736605371, mode=Mode.PRIVATE)
    chamfer2_piece_1 = split(chamfer2_piece_1, bisect_by=Plane(origin=(191.8, 31.825, -13.971645801), z_dir=(0, 1, 0)), keep=Keep.TOP, mode=Mode.PRIVATE)
    chamfer2_piece_1 = split(chamfer2_piece_1, bisect_by=Plane(origin=(188.974245231, 34.450110824, -10.05595705), z_dir=(0.5851852867542655, 0, -0.8108996116451951)), keep=Keep.TOP, mode=Mode.PRIVATE)
    chamfer2_piece_1 = split(chamfer2_piece_1, bisect_by=Plane(origin=(194.625754769, 34.450110824, -10.05595705), z_dir=(-0.5851852867542667, 0, -0.8108996116451941)), keep=Keep.TOP, mode=Mode.PRIVATE)
    add(chamfer2_piece_1, mode=Mode.SUBTRACT)
    with BuildSketch(Plane(origin=(131.031697314, 35.825, -14.625), x_dir=(0, 0.512728462387533, 0.8585508277660189), z_dir=(1, 0, 0))) as chamfer2_piece_2_section:
        with BuildLine():
            Line((2.846151297, 0), (-3.030407819, 4.809340769))
            Line((-3.030407819, 4.809340769), (-3.202117985, 4.706795077))
            ThreePointArc((-3.202117985, 4.706795077), (-1.628587032, 2.336957732), (-0.171710166, -0.102545692))
            Line((-0.171710166, -0.102545692), (0.102545692, -0.171710166))
            ThreePointArc((0.102545692, -0.171710166), (1.413174006, 0.221555438), (2.779590285, -0.188599129))
            Line((2.779590285, -0.188599129), (2.846151297, 0))
        make_face()
    chamfer2_piece_2 = extrude(amount=46.736605371, mode=Mode.PRIVATE)
    chamfer2_piece_2 = split(chamfer2_piece_2, bisect_by=Plane(origin=(151.574245231, 34.450110824, -10.05595705), z_dir=(0.5851852867542657, 0, -0.810899611645195)), keep=Keep.TOP, mode=Mode.PRIVATE)
    chamfer2_piece_2 = split(chamfer2_piece_2, bisect_by=Plane(origin=(157.225754769, 34.450110824, -10.05595705), z_dir=(-0.5851852867542657, 0, -0.810899611645195)), keep=Keep.TOP, mode=Mode.PRIVATE)
    chamfer2_piece_2 = split(chamfer2_piece_2, bisect_by=Plane(origin=(154.4, 31.825, -13.971645801), z_dir=(0, 1, 0)), keep=Keep.TOP, mode=Mode.PRIVATE)
    add(chamfer2_piece_2, mode=Mode.SUBTRACT)

    # Sketch72 → Cut-Extrude61 (cut, two sides: drawn at the far end of the back side and taken through both)
    with BuildSketch(Plane.ZY.offset(-9).offset(-CUT_EXTRUDE61_DEPTH_BACK)):
        with Locations((-22.5, 12.5)):
            Rectangle(SKETCH72_W, SKETCH72_H)
    extrude(amount=CUT_EXTRUDE61_DEPTH + CUT_EXTRUDE61_DEPTH_BACK, mode=Mode.SUBTRACT)

    # Sketch74 → Cut-Extrude62 (cut, through all)
    with BuildSketch(Plane.XZ.offset(-30)):
        with Locations((68.1, -22.5)):
            Rectangle(SKETCH74_W, SKETCH74_H)
    extrude(amount=-CUT_EXTRUDE62_DEPTH, mode=Mode.SUBTRACT)

    # Sketch81 → Cut-Extrude66 (cut)
    with BuildSketch(Plane(origin=(0, 42, 0), x_dir=(1, 0, 0), z_dir=(0, 1, 0))):
        with Locations((195.3, 22.5)):
            Rectangle(SKETCH81_W, SKETCH81_H)
    extrude(amount=-CUT_EXTRUDE66_DEPTH, mode=Mode.SUBTRACT)


solid = part.part
